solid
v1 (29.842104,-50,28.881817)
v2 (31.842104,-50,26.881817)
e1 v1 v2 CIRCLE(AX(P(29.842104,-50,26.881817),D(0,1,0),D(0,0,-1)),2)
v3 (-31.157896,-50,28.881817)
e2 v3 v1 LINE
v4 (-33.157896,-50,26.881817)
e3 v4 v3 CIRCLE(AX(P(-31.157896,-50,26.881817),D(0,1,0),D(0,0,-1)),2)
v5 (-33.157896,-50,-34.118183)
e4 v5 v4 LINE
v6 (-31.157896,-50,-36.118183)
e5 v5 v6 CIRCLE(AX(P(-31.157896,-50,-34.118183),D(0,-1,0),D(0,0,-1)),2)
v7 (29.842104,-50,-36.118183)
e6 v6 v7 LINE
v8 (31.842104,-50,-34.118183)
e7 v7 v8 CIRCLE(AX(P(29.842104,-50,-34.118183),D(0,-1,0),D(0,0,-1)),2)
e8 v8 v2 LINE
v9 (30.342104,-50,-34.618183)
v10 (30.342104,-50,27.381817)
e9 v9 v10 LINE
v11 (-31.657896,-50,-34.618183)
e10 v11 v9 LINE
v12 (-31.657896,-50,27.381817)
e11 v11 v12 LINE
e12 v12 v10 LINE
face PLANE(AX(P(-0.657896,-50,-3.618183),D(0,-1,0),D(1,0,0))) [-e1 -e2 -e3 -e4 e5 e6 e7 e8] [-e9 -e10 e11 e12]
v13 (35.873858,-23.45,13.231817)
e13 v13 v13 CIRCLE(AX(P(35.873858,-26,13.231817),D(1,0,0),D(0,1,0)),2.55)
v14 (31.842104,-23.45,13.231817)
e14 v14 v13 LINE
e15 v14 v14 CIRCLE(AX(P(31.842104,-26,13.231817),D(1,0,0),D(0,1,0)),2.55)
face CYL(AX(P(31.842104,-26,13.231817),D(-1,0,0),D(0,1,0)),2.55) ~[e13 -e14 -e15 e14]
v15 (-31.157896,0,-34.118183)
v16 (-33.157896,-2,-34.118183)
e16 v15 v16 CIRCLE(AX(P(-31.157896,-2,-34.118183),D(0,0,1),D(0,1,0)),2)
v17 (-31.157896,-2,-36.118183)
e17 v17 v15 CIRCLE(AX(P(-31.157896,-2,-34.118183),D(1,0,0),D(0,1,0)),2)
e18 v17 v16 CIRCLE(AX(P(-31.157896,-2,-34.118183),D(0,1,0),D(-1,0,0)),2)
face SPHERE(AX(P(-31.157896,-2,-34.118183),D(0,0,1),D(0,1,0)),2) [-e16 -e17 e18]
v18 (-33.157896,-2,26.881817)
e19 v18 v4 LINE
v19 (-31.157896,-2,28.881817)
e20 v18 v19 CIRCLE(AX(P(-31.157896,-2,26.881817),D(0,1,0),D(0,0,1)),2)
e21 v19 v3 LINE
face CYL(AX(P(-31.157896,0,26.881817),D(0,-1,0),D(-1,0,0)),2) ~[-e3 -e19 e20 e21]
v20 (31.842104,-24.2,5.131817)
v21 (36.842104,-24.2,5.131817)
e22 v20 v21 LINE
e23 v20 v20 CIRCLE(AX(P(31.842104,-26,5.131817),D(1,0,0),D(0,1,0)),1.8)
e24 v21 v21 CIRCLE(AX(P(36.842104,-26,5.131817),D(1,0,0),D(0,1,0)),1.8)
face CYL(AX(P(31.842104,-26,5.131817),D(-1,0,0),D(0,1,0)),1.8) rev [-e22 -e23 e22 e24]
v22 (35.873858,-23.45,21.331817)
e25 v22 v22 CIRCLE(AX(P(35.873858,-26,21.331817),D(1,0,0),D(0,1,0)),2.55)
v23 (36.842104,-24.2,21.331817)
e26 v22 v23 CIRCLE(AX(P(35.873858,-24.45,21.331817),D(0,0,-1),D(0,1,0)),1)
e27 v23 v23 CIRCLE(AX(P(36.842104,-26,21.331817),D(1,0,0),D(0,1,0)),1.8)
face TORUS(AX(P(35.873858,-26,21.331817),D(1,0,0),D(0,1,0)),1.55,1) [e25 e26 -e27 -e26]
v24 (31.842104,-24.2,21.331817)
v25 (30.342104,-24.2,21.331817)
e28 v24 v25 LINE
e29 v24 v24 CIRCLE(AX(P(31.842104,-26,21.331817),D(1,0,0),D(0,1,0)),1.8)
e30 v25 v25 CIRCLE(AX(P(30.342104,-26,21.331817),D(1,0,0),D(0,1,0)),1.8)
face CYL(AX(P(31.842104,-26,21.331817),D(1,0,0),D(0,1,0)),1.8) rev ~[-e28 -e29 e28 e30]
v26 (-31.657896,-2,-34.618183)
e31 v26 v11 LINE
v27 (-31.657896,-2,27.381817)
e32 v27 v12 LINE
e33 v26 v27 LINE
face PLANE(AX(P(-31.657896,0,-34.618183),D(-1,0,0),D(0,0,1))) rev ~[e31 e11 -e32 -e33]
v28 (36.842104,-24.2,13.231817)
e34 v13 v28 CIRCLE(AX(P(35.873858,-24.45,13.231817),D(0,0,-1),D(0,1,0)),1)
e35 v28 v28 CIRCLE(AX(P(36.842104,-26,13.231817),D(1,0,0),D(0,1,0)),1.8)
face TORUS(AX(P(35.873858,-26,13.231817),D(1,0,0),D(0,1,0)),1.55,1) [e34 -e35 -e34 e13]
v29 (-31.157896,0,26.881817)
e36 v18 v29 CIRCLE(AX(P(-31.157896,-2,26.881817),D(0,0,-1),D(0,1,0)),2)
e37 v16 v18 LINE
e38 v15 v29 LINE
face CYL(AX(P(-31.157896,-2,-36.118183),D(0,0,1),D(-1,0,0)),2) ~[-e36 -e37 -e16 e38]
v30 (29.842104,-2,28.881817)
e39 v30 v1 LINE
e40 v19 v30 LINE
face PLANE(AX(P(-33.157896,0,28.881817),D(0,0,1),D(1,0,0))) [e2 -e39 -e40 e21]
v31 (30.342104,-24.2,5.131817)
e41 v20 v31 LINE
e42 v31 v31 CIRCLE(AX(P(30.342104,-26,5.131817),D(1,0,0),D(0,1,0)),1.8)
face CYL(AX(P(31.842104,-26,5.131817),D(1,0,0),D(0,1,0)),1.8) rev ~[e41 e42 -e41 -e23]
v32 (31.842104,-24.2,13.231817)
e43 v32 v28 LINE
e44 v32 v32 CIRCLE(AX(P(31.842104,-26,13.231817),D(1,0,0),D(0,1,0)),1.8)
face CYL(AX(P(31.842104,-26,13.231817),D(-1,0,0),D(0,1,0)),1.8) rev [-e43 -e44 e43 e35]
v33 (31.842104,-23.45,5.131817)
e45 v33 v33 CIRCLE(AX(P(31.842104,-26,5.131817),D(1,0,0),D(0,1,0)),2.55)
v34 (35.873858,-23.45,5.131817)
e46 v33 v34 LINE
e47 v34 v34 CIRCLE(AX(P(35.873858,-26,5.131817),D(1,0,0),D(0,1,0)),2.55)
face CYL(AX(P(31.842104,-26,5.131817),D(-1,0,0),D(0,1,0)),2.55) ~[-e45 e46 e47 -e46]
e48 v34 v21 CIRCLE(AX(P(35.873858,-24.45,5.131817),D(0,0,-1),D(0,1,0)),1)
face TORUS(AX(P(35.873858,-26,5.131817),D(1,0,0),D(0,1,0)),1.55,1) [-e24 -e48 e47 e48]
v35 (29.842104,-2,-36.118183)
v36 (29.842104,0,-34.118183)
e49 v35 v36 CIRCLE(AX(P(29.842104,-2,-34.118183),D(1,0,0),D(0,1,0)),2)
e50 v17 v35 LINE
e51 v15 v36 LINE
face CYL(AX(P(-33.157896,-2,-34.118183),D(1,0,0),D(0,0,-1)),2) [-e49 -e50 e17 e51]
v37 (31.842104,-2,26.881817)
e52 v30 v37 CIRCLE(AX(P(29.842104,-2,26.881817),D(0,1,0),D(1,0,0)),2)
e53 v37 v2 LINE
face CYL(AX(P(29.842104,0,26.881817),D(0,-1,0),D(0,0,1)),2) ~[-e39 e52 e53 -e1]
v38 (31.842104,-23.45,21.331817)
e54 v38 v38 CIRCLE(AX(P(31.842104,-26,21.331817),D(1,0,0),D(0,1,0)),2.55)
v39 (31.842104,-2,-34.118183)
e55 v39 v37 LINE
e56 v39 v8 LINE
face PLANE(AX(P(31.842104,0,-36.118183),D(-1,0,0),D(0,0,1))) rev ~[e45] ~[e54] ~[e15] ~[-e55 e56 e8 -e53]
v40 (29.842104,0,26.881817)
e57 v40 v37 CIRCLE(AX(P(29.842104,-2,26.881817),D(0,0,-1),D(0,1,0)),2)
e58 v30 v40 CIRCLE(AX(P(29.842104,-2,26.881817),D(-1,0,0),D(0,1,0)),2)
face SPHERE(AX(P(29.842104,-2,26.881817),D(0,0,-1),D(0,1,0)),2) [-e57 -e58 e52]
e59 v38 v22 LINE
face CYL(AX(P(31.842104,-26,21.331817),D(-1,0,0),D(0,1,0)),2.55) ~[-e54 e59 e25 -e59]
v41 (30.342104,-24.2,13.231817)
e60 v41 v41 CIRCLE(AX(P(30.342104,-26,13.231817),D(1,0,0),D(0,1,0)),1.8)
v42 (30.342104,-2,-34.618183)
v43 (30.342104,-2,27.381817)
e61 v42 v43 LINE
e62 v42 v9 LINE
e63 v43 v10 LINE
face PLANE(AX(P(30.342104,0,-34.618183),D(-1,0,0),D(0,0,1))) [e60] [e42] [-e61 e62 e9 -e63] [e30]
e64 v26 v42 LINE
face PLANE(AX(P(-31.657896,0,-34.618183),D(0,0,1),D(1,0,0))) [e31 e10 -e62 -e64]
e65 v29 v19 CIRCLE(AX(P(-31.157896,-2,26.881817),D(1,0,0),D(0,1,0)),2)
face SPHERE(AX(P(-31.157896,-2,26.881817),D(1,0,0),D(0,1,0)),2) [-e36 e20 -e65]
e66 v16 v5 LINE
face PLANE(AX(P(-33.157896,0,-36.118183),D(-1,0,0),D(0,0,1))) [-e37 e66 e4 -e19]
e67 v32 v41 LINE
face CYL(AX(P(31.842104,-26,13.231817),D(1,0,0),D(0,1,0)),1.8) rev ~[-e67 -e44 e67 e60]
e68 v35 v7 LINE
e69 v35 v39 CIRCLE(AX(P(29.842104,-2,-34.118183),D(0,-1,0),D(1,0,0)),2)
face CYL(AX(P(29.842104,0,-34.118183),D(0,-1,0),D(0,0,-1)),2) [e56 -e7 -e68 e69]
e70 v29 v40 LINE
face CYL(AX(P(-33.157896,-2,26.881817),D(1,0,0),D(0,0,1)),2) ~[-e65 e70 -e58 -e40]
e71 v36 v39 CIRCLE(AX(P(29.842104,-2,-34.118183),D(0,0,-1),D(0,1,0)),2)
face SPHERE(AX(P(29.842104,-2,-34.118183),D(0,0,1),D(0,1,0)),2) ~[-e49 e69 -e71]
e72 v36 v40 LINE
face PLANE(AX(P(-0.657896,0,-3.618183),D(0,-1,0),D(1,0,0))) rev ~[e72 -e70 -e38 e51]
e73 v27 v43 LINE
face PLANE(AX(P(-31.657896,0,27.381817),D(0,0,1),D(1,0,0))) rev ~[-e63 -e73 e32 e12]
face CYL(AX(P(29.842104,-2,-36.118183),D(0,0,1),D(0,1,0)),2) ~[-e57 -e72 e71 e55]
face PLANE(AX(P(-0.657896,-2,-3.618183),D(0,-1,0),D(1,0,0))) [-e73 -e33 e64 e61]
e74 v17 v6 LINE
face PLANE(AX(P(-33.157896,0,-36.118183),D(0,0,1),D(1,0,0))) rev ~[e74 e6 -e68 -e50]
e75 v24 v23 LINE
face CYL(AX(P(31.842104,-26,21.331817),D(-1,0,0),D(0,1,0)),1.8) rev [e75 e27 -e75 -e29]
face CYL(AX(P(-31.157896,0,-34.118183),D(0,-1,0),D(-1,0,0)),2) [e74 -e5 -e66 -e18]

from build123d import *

# Parameters (mm, degrees)
F0_W     = 62
F0_H     = 62
F1_DEPTH = 2
F0_W_2   = 65
F0_H_2   = 65
F2_DEPTH = 50
F3_R     = 2
F4_R     = 1.8
F5_DEPTH = 25
F6_DEPTH = 25
F4_R_2   = 2.55
F7_DEPTH = 5


# Not quite as in the source:
# - a fillet or chamfer that OpenCascade refuses, or shapes differently, is made with other operations: its cross-section is extruded or revolved along the edge and cut away or added


with BuildPart() as f1:
    # F0 (on Front) → F1 (new body)
    with BuildSketch(Plane.XZ):
        with Locations((-0.6578962505, -3.6181825721)):
            Rectangle(F0_W, F0_H)
    extrude(amount=F1_DEPTH)

    # F0 (on Front) → F2 (join)
    with BuildSketch(Plane.XZ):
        with Locations((-0.6578962505, -3.6181825721)):
            Rectangle(F0_W_2, F0_H_2)
        with Locations((-0.6578962505, -3.6181825721)):
            Rectangle(F0_W, F0_H, mode=Mode.SUBTRACT)
    extrude(amount=F2_DEPTH)

    # F3
    f3_edges = [f1.edges().sort_by_distance(p)[0] for p in [
        (31.842104, 0, -3.618183),
        (-0.657896, 0, 28.881817),
        (-33.157896, 0, -3.618183),
        (-0.657896, 0, -36.118183),
        (31.842104, -25, 28.881817),
        (31.842104, -25, -36.118183),
        (-33.157896, -25, -36.118183),
        (-33.157896, -25, 28.881817),
    ]]
    fillet(f3_edges, radius=F3_R)

    # F4 (on face) → F5 (cut)
    with BuildSketch(Plane.YZ.offset(31.8421037495)):
        with Locations((-26, 21.3318174279)):
            Circle(F4_R)
    extrude(amount=-F5_DEPTH, mode=Mode.SUBTRACT)

    # F4 (on face) → F6 (cut)
    with BuildSketch(Plane.YZ.offset(31.8421037495)):
        with Locations((-26, 13.2318174279)):
            Circle(F4_R)
        with Locations((-26, 5.1318174279)):
            Circle(F4_R)
    extrude(amount=-F6_DEPTH, mode=Mode.SUBTRACT)

    # F4 (on face) → F7 (join)
    with BuildSketch(Plane.YZ.offset(31.8421037495)):
        with Locations((-26, 21.3318174279)):
            Circle(F4_R_2)
        with Locations((-26, 21.3318174279)):
            Circle(F4_R, mode=Mode.SUBTRACT)
        with Locations((-26, 13.2318174279)):
            Circle(F4_R_2)
        with Locations((-26, 13.2318174279)):
            Circle(F4_R, mode=Mode.SUBTRACT)
        with Locations((-26, 5.1318174279)):
            Circle(F4_R_2)
        with Locations((-26, 5.1318174279)):
            Circle(F4_R, mode=Mode.SUBTRACT)
    extrude(amount=F7_DEPTH)

    # F8: fillet of radius 1 on 3 edges, made by hand

    # F8_s1 → F8_t2 (revolve, cut)
    with BuildSketch(Plane.XY.offset(21.3318174279)):
        with BuildLine():
            ThreePointArc((35.873857913, -23.45), (36.4862303487, -23.659430585), (36.8421037495, -24.2))
            Line((36.8421037495, -24.2), (36.8421037495, -23.45))
            Line((36.8421037495, -23.45), (35.873857913, -23.45))
        make_face()
    revolve(axis=Axis((36.8421037495, -26, 21.3318174279), (1, 0, 0)), mode=Mode.SUBTRACT)

    # F8_s3 → F8_t4 (revolve, cut)
    with BuildSketch(Plane.XY.offset(13.2318174279)):
        with BuildLine():
            ThreePointArc((35.873857913, -23.45), (36.4862303487, -23.659430585), (36.8421037495, -24.2))
            Line((36.8421037495, -24.2), (36.8421037495, -23.45))
            Line((36.8421037495, -23.45), (35.873857913, -23.45))
        make_face()
    revolve(axis=Axis((36.8421037495, -26, 13.2318174279), (1, 0, 0)), mode=Mode.SUBTRACT)

    # F8_s5 → F8_t6 (revolve, cut)
    with BuildSketch(Plane.XY.offset(5.1318174279)):
        with BuildLine():
            ThreePointArc((35.873857913, -23.45), (36.4862303487, -23.659430585), (36.8421037495, -24.2))
            Line((36.8421037495, -24.2), (36.8421037495, -23.45))
            Line((36.8421037495, -23.45), (35.873857913, -23.45))
        make_face()
    revolve(axis=Axis((36.8421037495, -26, 5.1318174279), (1, 0, 0)), mode=Mode.SUBTRACT)


solid = f1.part
